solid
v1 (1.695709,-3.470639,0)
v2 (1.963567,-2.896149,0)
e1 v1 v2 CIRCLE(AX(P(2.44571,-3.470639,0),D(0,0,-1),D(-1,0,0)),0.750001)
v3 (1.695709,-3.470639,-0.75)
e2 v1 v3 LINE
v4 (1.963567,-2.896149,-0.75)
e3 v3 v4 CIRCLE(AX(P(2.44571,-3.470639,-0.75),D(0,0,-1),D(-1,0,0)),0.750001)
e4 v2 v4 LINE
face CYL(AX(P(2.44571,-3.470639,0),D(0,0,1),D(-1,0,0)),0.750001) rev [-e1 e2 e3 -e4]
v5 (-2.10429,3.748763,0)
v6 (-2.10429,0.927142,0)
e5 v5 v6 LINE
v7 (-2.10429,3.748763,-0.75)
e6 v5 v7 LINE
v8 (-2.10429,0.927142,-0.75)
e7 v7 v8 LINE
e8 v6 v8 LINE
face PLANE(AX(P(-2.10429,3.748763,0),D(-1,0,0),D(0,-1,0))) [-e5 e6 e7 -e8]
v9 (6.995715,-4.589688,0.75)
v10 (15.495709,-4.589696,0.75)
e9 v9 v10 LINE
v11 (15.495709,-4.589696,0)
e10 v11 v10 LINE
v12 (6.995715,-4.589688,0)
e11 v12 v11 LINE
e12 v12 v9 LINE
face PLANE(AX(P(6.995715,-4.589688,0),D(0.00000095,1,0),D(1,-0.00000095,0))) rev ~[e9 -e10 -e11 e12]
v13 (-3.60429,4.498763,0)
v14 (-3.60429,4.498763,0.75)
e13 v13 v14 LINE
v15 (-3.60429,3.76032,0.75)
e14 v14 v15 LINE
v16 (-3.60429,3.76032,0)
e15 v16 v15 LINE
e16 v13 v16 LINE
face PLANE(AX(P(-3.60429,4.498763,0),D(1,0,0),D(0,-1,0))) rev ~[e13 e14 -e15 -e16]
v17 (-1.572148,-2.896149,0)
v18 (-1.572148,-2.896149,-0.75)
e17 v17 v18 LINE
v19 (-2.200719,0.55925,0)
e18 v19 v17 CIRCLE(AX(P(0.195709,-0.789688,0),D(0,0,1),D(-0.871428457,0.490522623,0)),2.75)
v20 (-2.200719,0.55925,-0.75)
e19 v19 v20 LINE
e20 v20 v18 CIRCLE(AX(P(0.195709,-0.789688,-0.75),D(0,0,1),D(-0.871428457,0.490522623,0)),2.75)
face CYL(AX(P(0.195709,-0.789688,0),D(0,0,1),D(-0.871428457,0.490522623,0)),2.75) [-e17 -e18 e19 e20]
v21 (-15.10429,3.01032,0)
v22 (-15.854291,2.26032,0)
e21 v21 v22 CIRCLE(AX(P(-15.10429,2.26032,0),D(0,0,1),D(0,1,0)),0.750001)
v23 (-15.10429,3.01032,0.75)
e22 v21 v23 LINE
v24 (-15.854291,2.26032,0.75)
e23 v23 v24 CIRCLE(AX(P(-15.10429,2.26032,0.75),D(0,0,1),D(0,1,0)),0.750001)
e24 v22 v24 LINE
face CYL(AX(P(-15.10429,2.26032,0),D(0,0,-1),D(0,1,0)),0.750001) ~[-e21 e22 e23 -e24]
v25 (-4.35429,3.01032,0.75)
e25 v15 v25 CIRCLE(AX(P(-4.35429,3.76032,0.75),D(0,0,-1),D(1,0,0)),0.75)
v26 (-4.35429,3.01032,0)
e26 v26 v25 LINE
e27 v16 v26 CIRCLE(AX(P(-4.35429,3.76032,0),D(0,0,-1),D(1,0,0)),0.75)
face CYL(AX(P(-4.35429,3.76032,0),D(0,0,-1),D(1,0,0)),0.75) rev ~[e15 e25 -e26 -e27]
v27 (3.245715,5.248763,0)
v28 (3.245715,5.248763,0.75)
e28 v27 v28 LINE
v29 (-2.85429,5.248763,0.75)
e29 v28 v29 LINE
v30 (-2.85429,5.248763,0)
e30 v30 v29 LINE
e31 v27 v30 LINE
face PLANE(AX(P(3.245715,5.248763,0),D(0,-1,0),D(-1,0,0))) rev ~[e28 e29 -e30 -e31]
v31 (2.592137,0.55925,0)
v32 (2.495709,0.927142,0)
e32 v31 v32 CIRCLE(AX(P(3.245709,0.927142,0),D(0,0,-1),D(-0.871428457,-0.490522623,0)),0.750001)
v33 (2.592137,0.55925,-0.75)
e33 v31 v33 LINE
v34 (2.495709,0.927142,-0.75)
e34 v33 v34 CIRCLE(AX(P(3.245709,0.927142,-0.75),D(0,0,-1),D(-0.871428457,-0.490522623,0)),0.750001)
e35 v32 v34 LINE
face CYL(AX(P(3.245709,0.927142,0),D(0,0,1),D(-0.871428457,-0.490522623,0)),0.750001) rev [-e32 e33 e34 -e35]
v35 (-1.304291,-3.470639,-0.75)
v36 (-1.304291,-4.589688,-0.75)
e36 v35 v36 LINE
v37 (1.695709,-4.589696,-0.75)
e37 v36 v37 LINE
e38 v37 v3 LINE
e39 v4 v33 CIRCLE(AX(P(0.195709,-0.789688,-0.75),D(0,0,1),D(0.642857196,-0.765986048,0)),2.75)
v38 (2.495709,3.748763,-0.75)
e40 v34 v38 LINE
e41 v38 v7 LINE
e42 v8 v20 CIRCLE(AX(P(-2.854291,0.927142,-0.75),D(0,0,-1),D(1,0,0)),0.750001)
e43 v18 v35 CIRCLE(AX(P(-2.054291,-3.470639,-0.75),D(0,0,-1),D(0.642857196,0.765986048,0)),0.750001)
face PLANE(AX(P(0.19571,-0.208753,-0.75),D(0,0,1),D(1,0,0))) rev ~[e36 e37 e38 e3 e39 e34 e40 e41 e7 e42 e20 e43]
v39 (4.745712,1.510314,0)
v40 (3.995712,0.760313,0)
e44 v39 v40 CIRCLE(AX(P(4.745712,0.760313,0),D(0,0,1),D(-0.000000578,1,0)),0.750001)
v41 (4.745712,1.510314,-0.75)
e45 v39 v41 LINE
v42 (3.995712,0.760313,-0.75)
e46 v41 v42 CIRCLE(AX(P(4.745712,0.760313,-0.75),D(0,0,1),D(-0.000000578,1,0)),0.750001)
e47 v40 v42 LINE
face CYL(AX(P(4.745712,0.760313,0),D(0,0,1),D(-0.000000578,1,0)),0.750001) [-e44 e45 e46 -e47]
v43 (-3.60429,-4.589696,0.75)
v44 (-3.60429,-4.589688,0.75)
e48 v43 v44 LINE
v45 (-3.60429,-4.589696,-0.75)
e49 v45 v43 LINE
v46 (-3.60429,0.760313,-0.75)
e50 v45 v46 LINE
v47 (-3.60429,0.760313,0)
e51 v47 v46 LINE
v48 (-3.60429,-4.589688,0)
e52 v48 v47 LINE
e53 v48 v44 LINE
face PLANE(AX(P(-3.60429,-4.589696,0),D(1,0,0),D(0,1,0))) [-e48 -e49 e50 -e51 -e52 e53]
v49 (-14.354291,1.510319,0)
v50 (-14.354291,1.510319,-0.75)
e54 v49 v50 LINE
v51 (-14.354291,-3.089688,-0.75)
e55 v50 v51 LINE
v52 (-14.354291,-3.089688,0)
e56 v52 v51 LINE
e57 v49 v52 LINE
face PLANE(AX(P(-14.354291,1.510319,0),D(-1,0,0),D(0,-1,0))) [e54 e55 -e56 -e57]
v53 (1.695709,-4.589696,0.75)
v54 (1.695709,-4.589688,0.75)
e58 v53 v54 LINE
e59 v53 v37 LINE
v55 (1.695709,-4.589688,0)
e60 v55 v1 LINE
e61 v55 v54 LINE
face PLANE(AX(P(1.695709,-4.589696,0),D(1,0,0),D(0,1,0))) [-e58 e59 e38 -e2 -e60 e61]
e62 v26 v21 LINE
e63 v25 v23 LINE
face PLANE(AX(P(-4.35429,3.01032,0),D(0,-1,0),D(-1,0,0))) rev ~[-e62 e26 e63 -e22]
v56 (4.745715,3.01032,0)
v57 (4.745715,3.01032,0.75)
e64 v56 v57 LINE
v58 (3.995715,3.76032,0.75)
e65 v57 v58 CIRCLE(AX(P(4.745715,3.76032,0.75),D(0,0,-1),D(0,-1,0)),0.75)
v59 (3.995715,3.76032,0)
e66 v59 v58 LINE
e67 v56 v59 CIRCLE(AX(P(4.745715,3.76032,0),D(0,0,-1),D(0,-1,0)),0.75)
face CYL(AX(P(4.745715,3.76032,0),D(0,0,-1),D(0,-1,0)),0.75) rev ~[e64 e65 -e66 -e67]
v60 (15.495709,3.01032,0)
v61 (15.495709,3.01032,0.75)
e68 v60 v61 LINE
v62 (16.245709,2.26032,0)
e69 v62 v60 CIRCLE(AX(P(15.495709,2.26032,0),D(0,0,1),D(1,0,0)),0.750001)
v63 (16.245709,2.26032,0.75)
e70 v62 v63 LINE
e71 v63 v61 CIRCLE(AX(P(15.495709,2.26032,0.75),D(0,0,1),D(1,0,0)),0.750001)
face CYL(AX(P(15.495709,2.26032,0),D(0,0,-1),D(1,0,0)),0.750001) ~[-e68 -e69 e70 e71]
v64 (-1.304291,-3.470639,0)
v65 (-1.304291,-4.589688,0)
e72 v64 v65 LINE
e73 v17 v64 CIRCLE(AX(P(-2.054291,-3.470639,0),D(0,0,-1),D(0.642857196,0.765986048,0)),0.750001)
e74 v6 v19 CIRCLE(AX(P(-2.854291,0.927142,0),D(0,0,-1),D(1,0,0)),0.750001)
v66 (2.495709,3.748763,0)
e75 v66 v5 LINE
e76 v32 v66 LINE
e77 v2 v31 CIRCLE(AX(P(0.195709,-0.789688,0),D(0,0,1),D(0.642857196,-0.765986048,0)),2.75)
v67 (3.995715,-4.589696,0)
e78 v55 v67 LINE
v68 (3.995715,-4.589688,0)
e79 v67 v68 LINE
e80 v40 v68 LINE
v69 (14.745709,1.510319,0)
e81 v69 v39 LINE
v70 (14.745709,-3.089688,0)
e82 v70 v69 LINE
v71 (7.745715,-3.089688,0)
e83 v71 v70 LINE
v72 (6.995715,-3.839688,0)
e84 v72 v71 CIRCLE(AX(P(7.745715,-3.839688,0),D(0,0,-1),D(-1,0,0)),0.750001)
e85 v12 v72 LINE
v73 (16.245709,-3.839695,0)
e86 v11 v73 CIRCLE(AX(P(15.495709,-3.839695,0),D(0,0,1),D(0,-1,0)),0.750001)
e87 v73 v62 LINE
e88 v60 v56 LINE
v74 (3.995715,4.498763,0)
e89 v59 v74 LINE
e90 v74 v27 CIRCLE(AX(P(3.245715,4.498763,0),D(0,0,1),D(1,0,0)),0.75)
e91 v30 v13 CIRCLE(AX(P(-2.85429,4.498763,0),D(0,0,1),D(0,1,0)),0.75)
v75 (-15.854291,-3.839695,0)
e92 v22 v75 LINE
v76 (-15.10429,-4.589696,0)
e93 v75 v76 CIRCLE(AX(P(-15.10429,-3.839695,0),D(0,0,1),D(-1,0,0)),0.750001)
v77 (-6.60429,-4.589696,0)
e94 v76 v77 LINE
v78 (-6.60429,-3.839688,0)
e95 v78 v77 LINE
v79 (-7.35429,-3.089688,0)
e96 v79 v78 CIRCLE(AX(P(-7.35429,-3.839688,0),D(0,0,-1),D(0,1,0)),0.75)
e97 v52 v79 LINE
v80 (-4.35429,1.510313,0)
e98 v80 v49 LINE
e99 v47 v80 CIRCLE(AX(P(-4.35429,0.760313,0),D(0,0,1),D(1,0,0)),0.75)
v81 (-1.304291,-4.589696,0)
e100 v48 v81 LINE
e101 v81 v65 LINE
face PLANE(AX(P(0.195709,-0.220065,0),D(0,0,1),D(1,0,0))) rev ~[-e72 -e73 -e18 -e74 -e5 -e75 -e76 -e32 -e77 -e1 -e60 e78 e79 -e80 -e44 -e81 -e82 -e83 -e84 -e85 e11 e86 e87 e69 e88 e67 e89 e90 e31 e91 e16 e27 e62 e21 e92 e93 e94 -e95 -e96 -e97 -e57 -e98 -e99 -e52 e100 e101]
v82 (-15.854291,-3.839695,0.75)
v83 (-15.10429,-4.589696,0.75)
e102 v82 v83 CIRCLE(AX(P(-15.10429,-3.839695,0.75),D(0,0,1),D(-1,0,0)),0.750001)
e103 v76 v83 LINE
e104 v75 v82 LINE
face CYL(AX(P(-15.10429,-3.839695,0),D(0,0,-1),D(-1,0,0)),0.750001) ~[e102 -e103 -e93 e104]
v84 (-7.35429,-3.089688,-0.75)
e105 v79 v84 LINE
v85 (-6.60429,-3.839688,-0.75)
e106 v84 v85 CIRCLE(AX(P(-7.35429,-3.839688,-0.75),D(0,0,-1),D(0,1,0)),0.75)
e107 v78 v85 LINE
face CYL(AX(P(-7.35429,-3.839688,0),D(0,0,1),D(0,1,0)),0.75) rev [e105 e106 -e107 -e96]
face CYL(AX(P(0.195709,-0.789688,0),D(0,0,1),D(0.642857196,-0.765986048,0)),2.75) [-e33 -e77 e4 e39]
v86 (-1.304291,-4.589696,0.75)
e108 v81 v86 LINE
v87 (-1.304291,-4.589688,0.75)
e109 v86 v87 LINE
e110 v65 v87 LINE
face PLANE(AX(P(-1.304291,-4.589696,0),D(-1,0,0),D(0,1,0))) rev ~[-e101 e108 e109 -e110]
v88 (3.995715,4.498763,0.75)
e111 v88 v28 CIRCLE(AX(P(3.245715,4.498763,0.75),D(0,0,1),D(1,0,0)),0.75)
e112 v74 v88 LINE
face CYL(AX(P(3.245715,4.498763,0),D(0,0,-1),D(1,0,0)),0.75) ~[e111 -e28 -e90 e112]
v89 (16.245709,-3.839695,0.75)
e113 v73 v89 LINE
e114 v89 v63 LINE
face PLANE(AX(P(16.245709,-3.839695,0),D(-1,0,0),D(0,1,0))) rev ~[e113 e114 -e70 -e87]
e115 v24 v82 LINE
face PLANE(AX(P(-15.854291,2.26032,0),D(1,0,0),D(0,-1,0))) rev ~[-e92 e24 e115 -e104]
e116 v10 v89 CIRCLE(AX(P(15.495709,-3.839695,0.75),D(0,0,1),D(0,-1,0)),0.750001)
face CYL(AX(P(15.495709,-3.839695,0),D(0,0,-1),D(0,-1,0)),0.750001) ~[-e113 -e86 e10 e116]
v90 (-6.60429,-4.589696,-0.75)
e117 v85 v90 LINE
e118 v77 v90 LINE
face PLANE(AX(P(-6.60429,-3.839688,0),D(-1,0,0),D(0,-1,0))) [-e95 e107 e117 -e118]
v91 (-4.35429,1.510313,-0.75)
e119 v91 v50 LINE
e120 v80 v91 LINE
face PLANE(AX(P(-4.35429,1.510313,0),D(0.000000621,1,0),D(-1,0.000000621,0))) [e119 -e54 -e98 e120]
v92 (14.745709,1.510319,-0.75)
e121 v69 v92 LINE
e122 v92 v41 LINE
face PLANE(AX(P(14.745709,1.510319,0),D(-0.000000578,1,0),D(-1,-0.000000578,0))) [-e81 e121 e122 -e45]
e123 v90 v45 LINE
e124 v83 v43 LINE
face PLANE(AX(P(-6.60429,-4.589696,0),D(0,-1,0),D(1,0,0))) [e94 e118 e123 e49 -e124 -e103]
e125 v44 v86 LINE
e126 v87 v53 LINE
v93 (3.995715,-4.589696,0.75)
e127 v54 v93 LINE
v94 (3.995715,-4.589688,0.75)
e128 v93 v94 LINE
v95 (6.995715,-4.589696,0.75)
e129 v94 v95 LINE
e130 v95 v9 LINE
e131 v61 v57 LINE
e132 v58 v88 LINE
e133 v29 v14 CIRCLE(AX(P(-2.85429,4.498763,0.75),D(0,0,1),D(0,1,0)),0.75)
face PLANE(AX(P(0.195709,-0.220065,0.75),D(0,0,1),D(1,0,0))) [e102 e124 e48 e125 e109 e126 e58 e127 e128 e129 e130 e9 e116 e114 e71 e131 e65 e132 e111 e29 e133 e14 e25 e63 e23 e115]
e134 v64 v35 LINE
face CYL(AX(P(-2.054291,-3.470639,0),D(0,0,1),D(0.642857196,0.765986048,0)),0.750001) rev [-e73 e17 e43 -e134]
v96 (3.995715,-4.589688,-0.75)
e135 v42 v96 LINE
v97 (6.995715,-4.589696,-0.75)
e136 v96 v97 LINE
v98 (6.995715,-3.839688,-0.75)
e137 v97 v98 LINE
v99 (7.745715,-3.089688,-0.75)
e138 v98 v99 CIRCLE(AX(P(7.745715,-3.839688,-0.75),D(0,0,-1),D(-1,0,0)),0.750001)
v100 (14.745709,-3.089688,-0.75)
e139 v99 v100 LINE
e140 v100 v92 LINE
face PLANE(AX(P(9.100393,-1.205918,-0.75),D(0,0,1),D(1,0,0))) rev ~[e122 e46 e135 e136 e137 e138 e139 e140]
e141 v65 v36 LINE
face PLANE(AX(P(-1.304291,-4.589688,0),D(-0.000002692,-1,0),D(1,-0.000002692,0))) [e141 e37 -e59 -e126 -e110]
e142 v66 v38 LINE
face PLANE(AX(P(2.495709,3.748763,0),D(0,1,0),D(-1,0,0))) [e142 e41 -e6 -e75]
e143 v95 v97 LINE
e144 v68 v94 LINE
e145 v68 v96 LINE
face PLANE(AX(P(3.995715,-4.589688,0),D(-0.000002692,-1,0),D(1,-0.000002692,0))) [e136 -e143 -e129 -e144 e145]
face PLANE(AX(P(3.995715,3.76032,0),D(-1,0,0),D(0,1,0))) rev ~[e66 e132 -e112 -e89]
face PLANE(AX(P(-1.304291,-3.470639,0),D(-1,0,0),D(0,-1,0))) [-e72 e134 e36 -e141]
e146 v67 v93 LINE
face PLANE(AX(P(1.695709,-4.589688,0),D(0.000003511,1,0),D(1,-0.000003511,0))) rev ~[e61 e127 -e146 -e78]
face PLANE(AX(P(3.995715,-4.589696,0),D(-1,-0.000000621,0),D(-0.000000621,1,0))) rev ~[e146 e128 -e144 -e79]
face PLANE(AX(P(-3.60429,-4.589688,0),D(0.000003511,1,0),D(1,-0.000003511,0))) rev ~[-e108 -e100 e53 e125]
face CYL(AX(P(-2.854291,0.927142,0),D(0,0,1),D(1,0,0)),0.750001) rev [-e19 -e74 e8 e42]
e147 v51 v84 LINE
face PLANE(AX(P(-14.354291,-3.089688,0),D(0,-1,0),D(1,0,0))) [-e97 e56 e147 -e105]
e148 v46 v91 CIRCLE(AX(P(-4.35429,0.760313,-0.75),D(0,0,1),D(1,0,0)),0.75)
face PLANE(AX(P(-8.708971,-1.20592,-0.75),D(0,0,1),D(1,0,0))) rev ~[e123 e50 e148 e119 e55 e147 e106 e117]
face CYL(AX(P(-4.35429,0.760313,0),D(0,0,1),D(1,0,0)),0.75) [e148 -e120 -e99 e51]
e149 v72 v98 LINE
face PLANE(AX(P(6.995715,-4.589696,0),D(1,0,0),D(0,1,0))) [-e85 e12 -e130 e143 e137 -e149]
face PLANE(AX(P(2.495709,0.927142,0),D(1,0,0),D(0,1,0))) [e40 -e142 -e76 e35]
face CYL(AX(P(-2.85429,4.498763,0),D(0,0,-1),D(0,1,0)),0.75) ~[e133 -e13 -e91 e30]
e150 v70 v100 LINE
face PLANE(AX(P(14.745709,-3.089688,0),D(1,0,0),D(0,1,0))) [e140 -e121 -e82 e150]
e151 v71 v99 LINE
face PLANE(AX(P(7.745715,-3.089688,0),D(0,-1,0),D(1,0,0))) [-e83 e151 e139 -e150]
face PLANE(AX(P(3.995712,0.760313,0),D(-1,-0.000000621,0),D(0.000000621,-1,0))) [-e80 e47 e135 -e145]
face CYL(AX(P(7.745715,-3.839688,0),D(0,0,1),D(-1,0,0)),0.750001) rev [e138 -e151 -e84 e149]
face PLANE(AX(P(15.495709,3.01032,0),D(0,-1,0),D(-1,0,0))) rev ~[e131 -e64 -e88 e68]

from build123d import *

# Parameters (mm, degrees)
F1_DEPTH = 0.75
F2_DEPTH = 0.75


# Not quite as in the source:
# - ends of sketch curves that miss each other by under 0.0002 mm in the source are joined


with BuildPart() as f1:
    # F0 (on Top) → F1 (new body)
    with BuildSketch(Plane.XY):
        with BuildLine():
            Line((-4.3542903055, 3.0103204122), (-15.1042902548, 3.0103204122))
            ThreePointArc((-15.1042902548, 3.0103204122), (-15.634620706, 2.7906503467), (-15.8542907714, 2.2603198956))
            Line((-15.8542907714, 2.2603198956), (-15.8542907714, -3.8396952234))
            ThreePointArc((-15.8542907714, -3.8396952234), (-15.634620706, -4.3700256746), (-15.1042902548, -4.58969574))
            Line((-15.1042902548, -4.58969574), (-6.6042903055, -4.58969574))
            Line((-6.6042903055, -4.58969574), (-6.6042903055, -3.8396876639))
            ThreePointArc((-6.6042903055, -3.8396876639), (-6.8239602196, -3.309357578), (-7.3542903055, -3.0896876639))
            Line((-7.3542903055, -3.0896876639), (-14.3542907714, -3.0896876639))
            Line((-14.3542907714, -3.0896876639), (-14.3542907714, 1.5103194803))
            Line((-14.3542907714, 1.5103194803), (-4.3542898395, 1.5103132679))
            ThreePointArc((-4.3542898395, 1.5103132679), (-3.8239600548, 1.2906431891), (-3.6042903055, 0.7603132679))
            Line((-3.6042903055, 0.7603132679), (-3.6042903055, -4.5896876639))
            Line((-3.6042903055, -4.5896876639), (-1.3042907714, -4.58969574))
            Line((-1.3042907714, -4.58969574), (-1.3042907714, -3.4706392285))
            ThreePointArc((-1.3042907714, -3.4706392285), (-1.3745455835, -3.153706188), (-1.5721480592, -2.8961492966))
            ThreePointArc((-1.5721480592, -2.8961492966), (-2.5098893785, -1.2818626098), (-2.2007190289, 0.5592495498))
            ThreePointArc((-2.2007190289, 0.5592495498), (-2.1287979009, 0.7369818479), (-2.1042903055, 0.9271417706))
            Line((-2.1042903055, 0.9271417706), (-2.1042903055, 3.7487632608))
            Line((-2.1042903055, 3.7487632608), (2.4957087627, 3.7487632608))
            Line((2.4957087627, 3.7487632608), (2.4957087627, 0.9271417706))
            ThreePointArc((2.4957087627, 0.9271417706), (2.5202163581, 0.7369818479), (2.5921374862, 0.5592495498))
            ThreePointArc((2.5921374862, 0.5592495498), (2.9013078357, -1.2818626098), (1.9635665164, -2.8961492966))
            ThreePointArc((1.9635665164, -2.8961492966), (1.7659640407, -3.153706188), (1.6957092286, -3.4706392285))
            Line((1.6957092286, -3.4706392285), (1.6957092286, -4.5896876639))
            Line((1.6957092286, -4.5896876639), (3.9957149822, -4.58969574))
            Line((3.9957149822, -4.58969574), (3.9957116586, 0.7603127188))
            ThreePointArc((3.9957116586, 0.7603127188), (4.2153814061, 1.290643318), (4.7457117418, 1.5103137014))
            Line((4.7457117418, 1.5103137014), (14.7457092286, 1.5103194803))
            Line((14.7457092286, 1.5103194803), (14.7457092286, -3.0896876639))
            Line((14.7457092286, -3.0896876639), (7.7457154989, -3.0896876639))
            ThreePointArc((7.7457154989, -3.0896876639), (7.2153850477, -3.3093577293), (6.9957149822, -3.8396881805))
            Line((6.9957149822, -3.8396881805), (6.9957149822, -4.5896876639))
            Line((6.9957149822, -4.5896876639), (15.495708712, -4.58969574))
            ThreePointArc((15.495708712, -4.58969574), (16.0260391632, -4.3700256746), (16.2457092286, -3.8396952234))
            Line((16.2457092286, -3.8396952234), (16.2457092286, 2.2603198956))
            ThreePointArc((16.2457092286, 2.2603198956), (16.0260391632, 2.7906503467), (15.495708712, 3.0103204122))
            Line((15.495708712, 3.0103204122), (4.7457149822, 3.0103204122))
            ThreePointArc((4.7457149822, 3.0103204122), (4.2153848964, 3.2299903263), (3.9957149822, 3.7603204122))
            Line((3.9957149822, 3.7603204122), (3.9957149822, 4.4987632608))
            ThreePointArc((3.9957149822, 4.4987632608), (3.7760450681, 5.0290933467), (3.2457149822, 5.2487632608))
            Line((3.2457149822, 5.2487632608), (-2.8542903055, 5.2487632608))
            ThreePointArc((-2.8542903055, 5.2487632608), (-3.3846203913, 5.0290933467), (-3.6042903055, 4.4987632608))
            Line((-3.6042903055, 4.4987632608), (-3.6042903055, 3.7603204122))
            ThreePointArc((-3.6042903055, 3.7603204122), (-3.8239602196, 3.2299903263), (-4.3542903055, 3.0103204122))
        make_face()
        with BuildLine():
            Line((-6.6042903055, -3.8396876639), (-6.6042903055, -4.58969574))
            Line((-6.6042903055, -4.58969574), (-3.6042903055, -4.58969574))
            Line((-3.6042903055, -4.58969574), (-3.6042903055, 0.7603132679))
            ThreePointArc((-3.6042903055, 0.7603132679), (-3.8239600548, 1.2906431891), (-4.3542898395, 1.5103132679))
            Line((-4.3542898395, 1.5103132679), (-14.3542907714, 1.5103194803))
            Line((-14.3542907714, 1.5103194803), (-14.3542907714, -3.0896876639))
            Line((-14.3542907714, -3.0896876639), (-7.3542903055, -3.0896876639))
            ThreePointArc((-7.3542903055, -3.0896876639), (-6.8239602196, -3.309357578), (-6.6042903055, -3.8396876639))
        make_face()
        with BuildLine():
            Line((3.9957116586, 0.7603127188), (3.9957149822, -4.5896876639))
            Line((3.9957149822, -4.5896876639), (6.9957149822, -4.58969574))
            Line((6.9957149822, -4.58969574), (6.9957149822, -3.8396881805))
            ThreePointArc((6.9957149822, -3.8396881805), (7.2153850477, -3.3093577293), (7.7457154989, -3.0896876639))
            Line((7.7457154989, -3.0896876639), (14.7457092286, -3.0896876639))
            Line((14.7457092286, -3.0896876639), (14.7457092286, 1.5103194803))
            Line((14.7457092286, 1.5103194803), (4.7457117418, 1.5103137014))
            ThreePointArc((4.7457117418, 1.5103137014), (4.2153814061, 1.290643318), (3.9957116586, 0.7603127188))
        make_face()
        with BuildLine():
            Line((-1.3042907714, -3.4706392285), (-1.3042907714, -4.5896876639))
            Line((-1.3042907714, -4.5896876639), (1.6957092286, -4.58969574))
            Line((1.6957092286, -4.58969574), (1.6957092286, -3.4706392285))
            ThreePointArc((1.6957092286, -3.4706392285), (1.7659640407, -3.153706188), (1.9635665164, -2.8961492966))
            ThreePointArc((1.9635665164, -2.8961492966), (2.9013078357, -1.2818626098), (2.5921374862, 0.5592495498))
            ThreePointArc((2.5921374862, 0.5592495498), (2.5202163581, 0.7369818479), (2.4957087627, 0.9271417706))
            Line((2.4957087627, 0.9271417706), (2.4957087627, 3.7487632608))
            Line((2.4957087627, 3.7487632608), (-2.1042903055, 3.7487632608))
            Line((-2.1042903055, 3.7487632608), (-2.1042903055, 0.9271417706))
            ThreePointArc((-2.1042903055, 0.9271417706), (-2.1287979009, 0.7369818479), (-2.2007190289, 0.5592495498))
            ThreePointArc((-2.2007190289, 0.5592495498), (-2.5098893785, -1.2818626098), (-1.5721480592, -2.8961492966))
            ThreePointArc((-1.5721480592, -2.8961492966), (-1.3745455835, -3.153706188), (-1.3042907714, -3.4706392285))
        make_face()
    extrude(amount=F1_DEPTH)

    # F0 (on Top) → F2 (join)
    with BuildSketch(Plane.XY):
        with BuildLine():
            Line((-6.6042903055, -3.8396876639), (-6.6042903055, -4.58969574))
            Line((-6.6042903055, -4.58969574), (-3.6042903055, -4.58969574))
            Line((-3.6042903055, -4.58969574), (-3.6042903055, 0.7603132679))
            ThreePointArc((-3.6042903055, 0.7603132679), (-3.8239600548, 1.2906431891), (-4.3542898395, 1.5103132679))
            Line((-4.3542898395, 1.5103132679), (-14.3542907714, 1.5103194803))
            Line((-14.3542907714, 1.5103194803), (-14.3542907714, -3.0896876639))
            Line((-14.3542907714, -3.0896876639), (-7.3542903055, -3.0896876639))
            ThreePointArc((-7.3542903055, -3.0896876639), (-6.8239602196, -3.309357578), (-6.6042903055, -3.8396876639))
        make_face()
        with BuildLine():
            Line((-1.3042907714, -3.4706392285), (-1.3042907714, -4.5896876639))
            Line((-1.3042907714, -4.5896876639), (1.6957092286, -4.58969574))
            Line((1.6957092286, -4.58969574), (1.6957092286, -3.4706392285))
            ThreePointArc((1.6957092286, -3.4706392285), (1.7659640407, -3.153706188), (1.9635665164, -2.8961492966))
            ThreePointArc((1.9635665164, -2.8961492966), (2.9013078357, -1.2818626098), (2.5921374862, 0.5592495498))
            ThreePointArc((2.5921374862, 0.5592495498), (2.5202163581, 0.7369818479), (2.4957087627, 0.9271417706))
            Line((2.4957087627, 0.9271417706), (2.4957087627, 3.7487632608))
            Line((2.4957087627, 3.7487632608), (-2.1042903055, 3.7487632608))
            Line((-2.1042903055, 3.7487632608), (-2.1042903055, 0.9271417706))
            ThreePointArc((-2.1042903055, 0.9271417706), (-2.1287979009, 0.7369818479), (-2.2007190289, 0.5592495498))
            ThreePointArc((-2.2007190289, 0.5592495498), (-2.5098893785, -1.2818626098), (-1.5721480592, -2.8961492966))
            ThreePointArc((-1.5721480592, -2.8961492966), (-1.3745455835, -3.153706188), (-1.3042907714, -3.4706392285))
        make_face()
        with BuildLine():
            Line((3.9957116586, 0.7603127188), (3.9957149822, -4.5896876639))
            Line((3.9957149822, -4.5896876639), (6.9957149822, -4.58969574))
            Line((6.9957149822, -4.58969574), (6.9957149822, -3.8396881805))
            ThreePointArc((6.9957149822, -3.8396881805), (7.2153850477, -3.3093577293), (7.7457154989, -3.0896876639))
            Line((7.7457154989, -3.0896876639), (14.7457092286, -3.0896876639))
            Line((14.7457092286, -3.0896876639), (14.7457092286, 1.5103194803))
            Line((14.7457092286, 1.5103194803), (4.7457117418, 1.5103137014))
            ThreePointArc((4.7457117418, 1.5103137014), (4.2153814061, 1.290643318), (3.9957116586, 0.7603127188))
        make_face()
    extrude(amount=-F2_DEPTH)


solid = f1.part
